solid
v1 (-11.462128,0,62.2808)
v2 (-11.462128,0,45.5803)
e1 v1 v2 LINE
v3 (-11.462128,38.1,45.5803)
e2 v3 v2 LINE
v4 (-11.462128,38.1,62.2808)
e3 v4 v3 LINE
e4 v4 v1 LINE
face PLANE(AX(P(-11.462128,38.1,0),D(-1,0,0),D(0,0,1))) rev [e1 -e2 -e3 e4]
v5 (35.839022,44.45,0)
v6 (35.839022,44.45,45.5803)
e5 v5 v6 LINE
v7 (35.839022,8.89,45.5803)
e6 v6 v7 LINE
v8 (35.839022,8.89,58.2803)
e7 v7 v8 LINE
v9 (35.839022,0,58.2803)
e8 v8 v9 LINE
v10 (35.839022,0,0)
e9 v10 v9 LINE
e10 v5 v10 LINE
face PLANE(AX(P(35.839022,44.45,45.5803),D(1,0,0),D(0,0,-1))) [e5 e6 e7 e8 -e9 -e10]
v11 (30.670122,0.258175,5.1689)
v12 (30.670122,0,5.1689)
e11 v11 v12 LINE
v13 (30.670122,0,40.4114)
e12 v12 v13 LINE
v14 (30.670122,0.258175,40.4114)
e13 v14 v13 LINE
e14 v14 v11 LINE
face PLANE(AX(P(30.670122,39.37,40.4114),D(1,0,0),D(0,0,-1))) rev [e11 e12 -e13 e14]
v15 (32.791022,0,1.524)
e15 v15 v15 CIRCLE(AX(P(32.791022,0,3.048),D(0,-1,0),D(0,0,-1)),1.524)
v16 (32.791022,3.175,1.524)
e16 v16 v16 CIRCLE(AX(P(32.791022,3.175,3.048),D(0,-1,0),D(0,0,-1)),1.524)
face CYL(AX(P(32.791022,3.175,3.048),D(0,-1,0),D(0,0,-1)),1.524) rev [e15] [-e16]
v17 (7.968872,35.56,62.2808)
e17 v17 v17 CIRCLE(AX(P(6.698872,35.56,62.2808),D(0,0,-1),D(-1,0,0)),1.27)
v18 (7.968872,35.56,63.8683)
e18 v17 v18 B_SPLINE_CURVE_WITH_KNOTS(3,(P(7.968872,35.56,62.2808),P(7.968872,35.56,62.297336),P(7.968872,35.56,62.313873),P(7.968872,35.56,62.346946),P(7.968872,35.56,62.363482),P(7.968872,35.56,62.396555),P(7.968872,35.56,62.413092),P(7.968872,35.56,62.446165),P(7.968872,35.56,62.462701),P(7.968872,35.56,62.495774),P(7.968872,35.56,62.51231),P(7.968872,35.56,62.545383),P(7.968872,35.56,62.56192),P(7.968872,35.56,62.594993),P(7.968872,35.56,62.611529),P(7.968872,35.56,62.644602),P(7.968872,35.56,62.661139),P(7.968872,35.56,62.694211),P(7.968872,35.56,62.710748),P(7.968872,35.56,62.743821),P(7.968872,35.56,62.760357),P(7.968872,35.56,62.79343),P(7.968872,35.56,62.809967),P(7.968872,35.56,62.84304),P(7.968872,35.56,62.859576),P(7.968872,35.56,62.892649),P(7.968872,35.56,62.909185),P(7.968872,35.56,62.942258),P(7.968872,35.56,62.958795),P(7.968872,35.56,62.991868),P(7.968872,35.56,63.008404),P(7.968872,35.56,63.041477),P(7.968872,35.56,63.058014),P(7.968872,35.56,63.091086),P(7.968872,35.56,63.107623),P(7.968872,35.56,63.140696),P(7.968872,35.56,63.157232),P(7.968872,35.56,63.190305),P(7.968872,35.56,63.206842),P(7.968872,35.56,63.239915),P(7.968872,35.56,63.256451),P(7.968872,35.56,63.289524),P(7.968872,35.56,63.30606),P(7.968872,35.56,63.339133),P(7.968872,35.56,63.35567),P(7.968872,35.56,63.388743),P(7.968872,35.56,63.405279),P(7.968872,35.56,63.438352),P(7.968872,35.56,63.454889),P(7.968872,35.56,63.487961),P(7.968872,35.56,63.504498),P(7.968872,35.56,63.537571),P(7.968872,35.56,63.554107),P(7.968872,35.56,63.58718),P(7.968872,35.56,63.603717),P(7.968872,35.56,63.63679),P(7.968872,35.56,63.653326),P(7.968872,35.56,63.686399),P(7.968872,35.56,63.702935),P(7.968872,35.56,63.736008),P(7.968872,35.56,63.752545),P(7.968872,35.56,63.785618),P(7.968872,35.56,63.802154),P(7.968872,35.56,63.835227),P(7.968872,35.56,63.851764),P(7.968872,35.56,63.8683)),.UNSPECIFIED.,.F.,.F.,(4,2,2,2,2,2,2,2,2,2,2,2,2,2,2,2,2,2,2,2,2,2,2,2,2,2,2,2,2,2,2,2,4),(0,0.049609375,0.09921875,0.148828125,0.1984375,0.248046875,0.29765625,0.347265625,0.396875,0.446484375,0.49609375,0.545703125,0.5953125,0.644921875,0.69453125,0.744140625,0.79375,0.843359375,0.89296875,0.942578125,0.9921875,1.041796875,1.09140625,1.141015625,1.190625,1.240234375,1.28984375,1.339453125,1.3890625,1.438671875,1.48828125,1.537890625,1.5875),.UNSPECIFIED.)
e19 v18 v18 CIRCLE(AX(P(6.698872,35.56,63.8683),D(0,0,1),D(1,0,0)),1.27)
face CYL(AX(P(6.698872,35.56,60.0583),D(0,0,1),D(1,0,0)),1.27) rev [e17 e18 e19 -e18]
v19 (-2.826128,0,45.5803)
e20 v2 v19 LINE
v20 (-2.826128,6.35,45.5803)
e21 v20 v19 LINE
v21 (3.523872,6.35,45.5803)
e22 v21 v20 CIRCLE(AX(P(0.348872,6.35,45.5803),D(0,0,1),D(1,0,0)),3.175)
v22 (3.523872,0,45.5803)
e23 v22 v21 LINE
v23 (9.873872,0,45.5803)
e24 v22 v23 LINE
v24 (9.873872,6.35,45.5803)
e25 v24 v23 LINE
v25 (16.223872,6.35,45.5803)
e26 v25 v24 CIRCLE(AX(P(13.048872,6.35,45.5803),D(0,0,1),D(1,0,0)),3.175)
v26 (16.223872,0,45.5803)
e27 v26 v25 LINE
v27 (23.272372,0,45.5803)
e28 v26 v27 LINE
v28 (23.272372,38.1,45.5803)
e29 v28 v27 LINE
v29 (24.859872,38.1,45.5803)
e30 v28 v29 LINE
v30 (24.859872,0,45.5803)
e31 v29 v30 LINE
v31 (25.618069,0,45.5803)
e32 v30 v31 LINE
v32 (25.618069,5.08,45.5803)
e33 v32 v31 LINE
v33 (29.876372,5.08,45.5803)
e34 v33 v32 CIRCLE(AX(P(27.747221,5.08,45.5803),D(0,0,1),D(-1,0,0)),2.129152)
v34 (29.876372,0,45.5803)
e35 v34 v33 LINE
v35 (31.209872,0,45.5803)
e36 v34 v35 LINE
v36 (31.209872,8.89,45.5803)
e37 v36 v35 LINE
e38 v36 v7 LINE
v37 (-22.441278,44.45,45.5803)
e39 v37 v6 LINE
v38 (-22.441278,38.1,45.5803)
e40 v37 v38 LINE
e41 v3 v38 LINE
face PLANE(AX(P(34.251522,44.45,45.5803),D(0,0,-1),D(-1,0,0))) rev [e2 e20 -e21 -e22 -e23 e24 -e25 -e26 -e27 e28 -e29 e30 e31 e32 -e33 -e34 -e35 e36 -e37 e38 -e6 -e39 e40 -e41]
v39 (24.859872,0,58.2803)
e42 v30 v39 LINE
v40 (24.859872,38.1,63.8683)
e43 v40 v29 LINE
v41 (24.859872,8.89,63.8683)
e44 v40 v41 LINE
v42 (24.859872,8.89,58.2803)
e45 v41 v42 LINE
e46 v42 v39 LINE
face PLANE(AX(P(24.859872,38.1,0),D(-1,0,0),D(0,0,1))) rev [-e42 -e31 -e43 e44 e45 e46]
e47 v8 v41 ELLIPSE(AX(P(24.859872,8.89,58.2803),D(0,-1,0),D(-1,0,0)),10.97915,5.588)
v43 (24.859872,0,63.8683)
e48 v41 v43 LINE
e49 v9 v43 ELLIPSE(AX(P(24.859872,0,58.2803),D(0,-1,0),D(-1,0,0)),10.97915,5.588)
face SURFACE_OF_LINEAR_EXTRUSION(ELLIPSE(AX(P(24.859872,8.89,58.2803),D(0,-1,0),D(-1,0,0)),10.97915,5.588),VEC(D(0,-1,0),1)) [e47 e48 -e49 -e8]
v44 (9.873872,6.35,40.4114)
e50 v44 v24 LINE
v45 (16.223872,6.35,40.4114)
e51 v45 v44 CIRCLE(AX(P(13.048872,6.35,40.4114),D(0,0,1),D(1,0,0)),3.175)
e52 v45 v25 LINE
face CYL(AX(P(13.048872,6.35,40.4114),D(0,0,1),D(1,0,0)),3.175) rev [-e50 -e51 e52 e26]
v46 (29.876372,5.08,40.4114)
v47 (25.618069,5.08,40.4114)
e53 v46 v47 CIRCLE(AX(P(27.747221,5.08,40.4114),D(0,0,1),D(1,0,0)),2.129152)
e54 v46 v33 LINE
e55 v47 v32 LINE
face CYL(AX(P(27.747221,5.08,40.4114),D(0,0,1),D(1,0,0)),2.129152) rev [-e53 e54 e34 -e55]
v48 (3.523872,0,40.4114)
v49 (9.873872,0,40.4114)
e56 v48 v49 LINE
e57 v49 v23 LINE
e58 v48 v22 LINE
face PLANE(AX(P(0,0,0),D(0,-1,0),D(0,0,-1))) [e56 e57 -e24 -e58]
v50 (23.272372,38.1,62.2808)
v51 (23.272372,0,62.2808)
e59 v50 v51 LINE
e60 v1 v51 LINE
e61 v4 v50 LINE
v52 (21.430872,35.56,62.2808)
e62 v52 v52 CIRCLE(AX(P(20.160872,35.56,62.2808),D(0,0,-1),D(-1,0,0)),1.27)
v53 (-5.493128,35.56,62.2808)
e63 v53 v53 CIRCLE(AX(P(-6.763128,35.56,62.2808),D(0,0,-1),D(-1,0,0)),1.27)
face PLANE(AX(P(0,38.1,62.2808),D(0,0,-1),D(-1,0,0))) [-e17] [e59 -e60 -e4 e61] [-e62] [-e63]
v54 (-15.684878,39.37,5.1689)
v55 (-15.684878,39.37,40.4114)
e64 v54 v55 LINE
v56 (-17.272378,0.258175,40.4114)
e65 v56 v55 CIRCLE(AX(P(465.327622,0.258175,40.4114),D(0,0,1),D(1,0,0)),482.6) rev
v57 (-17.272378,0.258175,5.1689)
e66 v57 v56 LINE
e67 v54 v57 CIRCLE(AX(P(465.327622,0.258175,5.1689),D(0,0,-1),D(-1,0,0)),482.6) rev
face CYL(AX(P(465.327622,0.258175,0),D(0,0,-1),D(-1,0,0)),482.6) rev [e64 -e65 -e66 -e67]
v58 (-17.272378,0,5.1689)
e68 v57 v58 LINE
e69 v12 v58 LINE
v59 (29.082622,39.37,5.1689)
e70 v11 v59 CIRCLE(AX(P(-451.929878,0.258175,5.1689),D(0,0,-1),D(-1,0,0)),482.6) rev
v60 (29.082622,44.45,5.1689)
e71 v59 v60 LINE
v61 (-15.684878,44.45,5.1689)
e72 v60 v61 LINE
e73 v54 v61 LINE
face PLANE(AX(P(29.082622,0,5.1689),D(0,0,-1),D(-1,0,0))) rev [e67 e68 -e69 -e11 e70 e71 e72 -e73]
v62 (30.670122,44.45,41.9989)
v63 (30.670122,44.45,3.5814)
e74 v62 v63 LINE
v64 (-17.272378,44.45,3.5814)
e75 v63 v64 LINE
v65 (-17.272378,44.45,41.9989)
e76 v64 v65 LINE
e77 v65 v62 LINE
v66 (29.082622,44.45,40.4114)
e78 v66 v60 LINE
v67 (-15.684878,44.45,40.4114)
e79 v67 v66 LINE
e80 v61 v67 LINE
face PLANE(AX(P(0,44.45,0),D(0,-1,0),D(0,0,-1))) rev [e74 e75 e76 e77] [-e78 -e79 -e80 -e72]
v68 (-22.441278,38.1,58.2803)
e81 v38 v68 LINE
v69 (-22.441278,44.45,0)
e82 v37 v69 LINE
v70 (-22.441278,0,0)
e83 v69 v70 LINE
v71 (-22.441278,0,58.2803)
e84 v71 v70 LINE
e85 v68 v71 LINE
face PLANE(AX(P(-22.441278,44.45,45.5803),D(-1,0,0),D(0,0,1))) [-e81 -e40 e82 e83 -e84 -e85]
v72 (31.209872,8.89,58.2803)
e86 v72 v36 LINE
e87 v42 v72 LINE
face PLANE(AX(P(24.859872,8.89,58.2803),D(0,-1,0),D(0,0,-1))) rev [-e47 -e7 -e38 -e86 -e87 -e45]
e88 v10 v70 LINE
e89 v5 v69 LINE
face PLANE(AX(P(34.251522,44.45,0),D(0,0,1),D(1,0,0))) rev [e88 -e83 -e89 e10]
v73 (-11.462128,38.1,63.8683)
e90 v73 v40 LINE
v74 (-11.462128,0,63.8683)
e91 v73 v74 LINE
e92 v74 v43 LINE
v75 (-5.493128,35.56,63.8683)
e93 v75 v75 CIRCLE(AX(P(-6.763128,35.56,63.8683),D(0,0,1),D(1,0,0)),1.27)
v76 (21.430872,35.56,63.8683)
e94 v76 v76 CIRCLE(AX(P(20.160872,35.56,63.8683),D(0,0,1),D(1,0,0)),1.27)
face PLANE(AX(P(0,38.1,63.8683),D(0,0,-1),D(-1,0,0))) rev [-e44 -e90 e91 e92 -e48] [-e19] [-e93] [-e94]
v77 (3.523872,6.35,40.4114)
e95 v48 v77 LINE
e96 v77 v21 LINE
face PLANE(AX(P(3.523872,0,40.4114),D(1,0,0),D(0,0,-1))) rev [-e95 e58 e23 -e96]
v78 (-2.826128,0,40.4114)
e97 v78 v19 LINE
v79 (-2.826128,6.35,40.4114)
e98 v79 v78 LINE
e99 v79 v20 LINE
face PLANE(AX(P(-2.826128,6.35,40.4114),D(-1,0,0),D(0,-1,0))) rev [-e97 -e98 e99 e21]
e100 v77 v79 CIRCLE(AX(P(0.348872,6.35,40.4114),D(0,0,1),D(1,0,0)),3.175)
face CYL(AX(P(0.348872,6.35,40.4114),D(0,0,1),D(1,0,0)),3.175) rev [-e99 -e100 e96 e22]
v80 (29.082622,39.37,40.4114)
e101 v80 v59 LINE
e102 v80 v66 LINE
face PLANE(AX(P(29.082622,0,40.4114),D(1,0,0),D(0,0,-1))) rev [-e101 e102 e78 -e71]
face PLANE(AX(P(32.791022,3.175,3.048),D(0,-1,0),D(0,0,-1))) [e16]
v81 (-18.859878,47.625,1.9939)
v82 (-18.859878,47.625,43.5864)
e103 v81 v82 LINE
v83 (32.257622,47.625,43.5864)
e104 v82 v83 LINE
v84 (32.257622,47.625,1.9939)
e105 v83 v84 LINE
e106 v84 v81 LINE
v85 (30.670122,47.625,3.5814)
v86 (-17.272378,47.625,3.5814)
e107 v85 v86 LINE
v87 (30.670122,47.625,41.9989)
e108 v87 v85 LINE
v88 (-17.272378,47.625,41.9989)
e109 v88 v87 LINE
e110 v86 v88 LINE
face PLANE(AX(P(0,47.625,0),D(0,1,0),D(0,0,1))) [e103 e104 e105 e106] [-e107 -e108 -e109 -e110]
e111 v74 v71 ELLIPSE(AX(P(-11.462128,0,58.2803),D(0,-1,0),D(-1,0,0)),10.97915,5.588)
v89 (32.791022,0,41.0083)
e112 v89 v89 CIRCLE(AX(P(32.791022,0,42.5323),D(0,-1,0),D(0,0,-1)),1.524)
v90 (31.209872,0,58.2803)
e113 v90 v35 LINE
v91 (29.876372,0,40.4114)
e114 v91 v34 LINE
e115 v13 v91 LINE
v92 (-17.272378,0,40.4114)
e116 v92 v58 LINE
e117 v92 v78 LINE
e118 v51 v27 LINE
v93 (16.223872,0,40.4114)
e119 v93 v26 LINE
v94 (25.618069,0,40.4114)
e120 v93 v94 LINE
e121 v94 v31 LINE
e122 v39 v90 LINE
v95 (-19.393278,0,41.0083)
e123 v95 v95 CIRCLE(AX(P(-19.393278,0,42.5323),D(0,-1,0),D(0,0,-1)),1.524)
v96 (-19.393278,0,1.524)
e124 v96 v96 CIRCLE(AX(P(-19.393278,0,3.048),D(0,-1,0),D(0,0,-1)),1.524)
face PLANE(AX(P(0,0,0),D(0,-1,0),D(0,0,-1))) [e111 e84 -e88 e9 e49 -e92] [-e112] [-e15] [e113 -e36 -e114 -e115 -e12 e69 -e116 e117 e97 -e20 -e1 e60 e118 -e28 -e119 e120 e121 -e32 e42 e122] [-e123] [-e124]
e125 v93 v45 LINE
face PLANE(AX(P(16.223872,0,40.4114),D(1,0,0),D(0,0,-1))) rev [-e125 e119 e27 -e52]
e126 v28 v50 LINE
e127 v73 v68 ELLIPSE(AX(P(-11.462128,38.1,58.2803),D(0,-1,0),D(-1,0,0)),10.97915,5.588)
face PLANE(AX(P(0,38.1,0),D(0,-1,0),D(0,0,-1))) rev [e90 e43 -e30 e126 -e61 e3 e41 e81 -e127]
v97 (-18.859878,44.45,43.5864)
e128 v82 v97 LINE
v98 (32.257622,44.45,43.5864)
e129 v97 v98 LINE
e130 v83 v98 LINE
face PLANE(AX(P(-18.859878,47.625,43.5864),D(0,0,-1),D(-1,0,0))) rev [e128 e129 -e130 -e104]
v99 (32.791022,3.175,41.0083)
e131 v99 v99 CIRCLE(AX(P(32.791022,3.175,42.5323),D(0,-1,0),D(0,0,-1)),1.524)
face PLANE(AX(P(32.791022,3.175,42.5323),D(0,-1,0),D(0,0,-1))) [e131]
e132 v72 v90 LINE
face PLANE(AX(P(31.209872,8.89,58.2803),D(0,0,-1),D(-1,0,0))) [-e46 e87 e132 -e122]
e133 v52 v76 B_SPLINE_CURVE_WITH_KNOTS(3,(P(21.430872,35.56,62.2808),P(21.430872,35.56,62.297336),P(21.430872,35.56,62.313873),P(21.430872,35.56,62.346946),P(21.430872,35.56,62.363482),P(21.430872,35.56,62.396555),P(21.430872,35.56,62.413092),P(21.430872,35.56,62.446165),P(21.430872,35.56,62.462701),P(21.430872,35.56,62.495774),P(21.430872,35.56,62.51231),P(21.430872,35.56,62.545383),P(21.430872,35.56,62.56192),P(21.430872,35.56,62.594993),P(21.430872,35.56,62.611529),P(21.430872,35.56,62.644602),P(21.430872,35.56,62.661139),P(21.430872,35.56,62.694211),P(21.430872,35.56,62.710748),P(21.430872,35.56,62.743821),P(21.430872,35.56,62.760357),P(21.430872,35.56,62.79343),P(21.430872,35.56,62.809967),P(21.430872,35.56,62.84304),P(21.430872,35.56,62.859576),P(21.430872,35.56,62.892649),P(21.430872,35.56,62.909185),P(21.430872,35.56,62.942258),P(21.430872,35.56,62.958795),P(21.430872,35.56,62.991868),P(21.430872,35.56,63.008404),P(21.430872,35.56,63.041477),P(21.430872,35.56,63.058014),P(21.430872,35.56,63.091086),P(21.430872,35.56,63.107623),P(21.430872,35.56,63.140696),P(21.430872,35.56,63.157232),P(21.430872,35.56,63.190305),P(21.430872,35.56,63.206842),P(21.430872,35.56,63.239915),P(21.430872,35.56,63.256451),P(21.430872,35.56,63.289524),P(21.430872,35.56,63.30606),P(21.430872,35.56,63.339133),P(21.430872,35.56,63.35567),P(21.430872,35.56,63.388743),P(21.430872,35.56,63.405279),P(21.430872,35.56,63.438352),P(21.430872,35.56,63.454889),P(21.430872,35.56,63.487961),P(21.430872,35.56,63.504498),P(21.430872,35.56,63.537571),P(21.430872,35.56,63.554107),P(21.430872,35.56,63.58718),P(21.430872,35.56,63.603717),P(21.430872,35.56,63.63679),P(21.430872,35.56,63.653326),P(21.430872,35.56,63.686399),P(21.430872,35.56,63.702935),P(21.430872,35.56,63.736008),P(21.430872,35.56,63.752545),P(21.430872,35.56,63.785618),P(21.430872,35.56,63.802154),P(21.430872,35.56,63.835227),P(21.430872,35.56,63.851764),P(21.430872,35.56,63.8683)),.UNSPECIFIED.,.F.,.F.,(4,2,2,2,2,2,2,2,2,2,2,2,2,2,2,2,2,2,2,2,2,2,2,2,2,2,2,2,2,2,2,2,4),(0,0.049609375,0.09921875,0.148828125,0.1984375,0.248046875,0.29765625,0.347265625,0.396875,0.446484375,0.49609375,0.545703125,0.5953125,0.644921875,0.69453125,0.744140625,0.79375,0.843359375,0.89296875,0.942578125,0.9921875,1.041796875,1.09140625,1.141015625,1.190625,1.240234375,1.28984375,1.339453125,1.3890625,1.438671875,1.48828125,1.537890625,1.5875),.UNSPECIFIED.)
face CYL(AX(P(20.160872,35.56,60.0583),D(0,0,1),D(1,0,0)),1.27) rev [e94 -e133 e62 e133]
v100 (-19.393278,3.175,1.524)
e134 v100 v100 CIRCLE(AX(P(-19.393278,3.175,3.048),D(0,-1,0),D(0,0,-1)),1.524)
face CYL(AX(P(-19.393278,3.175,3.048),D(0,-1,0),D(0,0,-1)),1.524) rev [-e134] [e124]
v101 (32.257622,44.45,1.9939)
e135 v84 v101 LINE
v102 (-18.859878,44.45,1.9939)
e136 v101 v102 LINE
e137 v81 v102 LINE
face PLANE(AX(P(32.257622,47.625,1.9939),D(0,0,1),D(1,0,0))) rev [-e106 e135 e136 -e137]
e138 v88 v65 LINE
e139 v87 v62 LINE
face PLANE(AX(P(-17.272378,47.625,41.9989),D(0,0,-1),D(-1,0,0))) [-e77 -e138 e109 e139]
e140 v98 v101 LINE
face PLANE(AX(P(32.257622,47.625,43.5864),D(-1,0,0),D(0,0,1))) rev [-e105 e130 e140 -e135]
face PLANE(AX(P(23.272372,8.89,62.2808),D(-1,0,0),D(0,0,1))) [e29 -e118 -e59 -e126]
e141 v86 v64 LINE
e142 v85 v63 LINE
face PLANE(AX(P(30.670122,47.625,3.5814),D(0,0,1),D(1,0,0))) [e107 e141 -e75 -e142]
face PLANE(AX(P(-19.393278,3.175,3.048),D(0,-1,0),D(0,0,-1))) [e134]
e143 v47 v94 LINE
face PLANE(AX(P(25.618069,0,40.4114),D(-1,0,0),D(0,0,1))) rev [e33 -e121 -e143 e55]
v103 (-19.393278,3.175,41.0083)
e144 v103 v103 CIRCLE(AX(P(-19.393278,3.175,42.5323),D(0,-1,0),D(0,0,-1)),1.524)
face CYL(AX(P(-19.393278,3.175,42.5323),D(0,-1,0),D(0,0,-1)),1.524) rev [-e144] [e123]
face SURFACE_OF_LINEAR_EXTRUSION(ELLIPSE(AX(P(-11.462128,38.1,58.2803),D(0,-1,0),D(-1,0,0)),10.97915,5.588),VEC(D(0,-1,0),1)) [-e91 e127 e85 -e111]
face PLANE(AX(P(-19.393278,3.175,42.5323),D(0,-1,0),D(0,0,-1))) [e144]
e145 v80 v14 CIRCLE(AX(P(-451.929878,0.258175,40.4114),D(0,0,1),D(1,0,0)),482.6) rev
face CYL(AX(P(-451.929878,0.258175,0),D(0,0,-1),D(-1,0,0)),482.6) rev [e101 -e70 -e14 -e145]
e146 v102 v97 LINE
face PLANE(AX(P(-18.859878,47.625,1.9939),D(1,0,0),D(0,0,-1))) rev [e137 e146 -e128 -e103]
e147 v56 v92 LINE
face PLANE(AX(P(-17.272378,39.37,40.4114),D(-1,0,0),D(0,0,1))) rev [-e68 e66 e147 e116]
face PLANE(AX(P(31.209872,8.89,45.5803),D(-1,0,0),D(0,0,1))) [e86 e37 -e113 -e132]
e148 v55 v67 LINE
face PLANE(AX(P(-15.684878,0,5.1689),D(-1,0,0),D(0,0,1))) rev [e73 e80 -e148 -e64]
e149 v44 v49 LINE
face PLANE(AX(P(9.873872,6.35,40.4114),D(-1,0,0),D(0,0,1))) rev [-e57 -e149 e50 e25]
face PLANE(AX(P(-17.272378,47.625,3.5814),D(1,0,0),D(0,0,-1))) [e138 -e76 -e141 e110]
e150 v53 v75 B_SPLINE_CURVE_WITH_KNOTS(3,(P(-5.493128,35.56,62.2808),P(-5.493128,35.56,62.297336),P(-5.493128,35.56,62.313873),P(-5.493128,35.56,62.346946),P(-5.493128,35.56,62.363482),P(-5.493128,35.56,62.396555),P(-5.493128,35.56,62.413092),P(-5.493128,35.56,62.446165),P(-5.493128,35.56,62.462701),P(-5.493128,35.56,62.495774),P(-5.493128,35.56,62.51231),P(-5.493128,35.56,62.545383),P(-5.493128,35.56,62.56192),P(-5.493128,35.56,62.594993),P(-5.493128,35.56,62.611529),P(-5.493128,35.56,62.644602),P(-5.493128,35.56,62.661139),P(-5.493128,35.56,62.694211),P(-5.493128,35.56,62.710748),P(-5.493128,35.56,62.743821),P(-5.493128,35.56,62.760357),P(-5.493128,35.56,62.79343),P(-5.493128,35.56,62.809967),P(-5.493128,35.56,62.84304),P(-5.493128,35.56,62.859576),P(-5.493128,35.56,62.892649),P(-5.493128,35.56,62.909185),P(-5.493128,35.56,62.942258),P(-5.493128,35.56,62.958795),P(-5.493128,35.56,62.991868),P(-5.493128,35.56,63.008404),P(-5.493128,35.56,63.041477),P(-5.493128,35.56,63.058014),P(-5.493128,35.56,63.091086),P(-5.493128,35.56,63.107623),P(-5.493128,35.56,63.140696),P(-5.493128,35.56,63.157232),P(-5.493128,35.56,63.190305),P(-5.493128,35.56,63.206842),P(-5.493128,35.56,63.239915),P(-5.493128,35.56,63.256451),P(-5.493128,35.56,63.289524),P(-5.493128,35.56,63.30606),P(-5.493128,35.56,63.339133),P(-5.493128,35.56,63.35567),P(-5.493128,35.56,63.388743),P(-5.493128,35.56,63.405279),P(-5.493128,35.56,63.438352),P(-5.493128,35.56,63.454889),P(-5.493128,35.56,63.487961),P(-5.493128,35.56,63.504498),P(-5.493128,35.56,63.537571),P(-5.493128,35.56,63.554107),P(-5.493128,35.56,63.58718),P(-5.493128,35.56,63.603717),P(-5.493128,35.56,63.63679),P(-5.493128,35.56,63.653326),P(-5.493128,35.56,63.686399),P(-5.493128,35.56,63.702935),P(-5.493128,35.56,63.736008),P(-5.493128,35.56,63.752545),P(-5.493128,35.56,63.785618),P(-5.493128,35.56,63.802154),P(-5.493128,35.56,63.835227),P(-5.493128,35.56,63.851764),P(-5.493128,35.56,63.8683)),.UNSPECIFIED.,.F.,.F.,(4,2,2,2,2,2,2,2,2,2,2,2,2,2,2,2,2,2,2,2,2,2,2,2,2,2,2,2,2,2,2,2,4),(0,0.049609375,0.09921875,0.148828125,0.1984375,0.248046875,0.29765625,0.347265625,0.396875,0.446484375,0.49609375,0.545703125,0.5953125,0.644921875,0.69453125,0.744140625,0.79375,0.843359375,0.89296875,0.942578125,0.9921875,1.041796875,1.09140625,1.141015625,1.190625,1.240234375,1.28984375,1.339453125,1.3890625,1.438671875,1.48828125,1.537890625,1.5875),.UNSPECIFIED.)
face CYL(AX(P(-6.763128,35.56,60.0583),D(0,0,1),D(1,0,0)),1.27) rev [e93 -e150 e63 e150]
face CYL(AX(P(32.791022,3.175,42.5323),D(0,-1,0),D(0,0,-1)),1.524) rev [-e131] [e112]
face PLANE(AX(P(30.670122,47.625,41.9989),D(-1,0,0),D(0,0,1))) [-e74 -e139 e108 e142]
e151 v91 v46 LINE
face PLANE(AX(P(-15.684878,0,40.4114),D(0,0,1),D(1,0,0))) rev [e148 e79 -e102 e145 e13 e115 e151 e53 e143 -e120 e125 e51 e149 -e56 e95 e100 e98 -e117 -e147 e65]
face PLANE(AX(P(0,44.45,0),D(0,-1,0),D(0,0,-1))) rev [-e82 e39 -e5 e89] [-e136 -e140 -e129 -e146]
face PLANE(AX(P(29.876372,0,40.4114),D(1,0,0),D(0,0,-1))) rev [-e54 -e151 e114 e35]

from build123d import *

# Parameters (mm, degrees)
SKETCH3_W            = 55.1053
SKETCH3_H            = 45.5803
BOSS_EXTRUDE2_DEPTH  = 44.45
SKETCH11_W           = 51.1175
SKETCH11_H           = 41.5925
SKETCH11_W_2         = 47.9425
SKETCH11_H_2         = 38.4175
BOSS_EXTRUDE3_DEPTH  = 3.175
SKETCH13_W           = 44.7675
SKETCH13_H           = 35.2425
CUT_EXTRUDE3_DEPTH   = 73.294764944
CUT_EXTRUDE4_DEPTH   = 5.1689
SKETCH19_W           = 1.5875
SKETCH19_H           = 45.5803
BOSS_EXTRUDE4_DEPTH  = 44.45
SKETCH21_W           = 1.5875
SKETCH21_H           = 35.2425
CUT_EXTRUDE5_DEPTH   = 39.37
FILLET1_R            = 482.6
FILLET2_R            = 482.6
SKETCH22_R           = 1.524
CUT_EXTRUDE7_DEPTH   = 3.175
BOSS_EXTRUDE5_DEPTH  = 38.1
SKETCH39_R           = 1.27
CUT_EXTRUDE14_DEPTH  = 3.81
BOSS_EXTRUDE22_DEPTH = 8.89
SKETCH48_W           = 18.288
SKETCH48_H           = 29.21
BOSS_EXTRUDE23_DEPTH = 1.5875


with BuildPart() as part:
    # Sketch3 → Boss-Extrude2 (new body)
    with BuildSketch(Plane(origin=(0, 0, 0), x_dir=(1, 0, 0), z_dir=(0, 1, 0))):
        with Locations((6.69887245, -22.79015)):
            Rectangle(SKETCH3_W, SKETCH3_H)
    extrude(amount=BOSS_EXTRUDE2_DEPTH)

    # Sketch11 → Boss-Extrude3 (add)
    with BuildSketch(Plane(origin=(0, 44.45, 0), x_dir=(1, 0, 0), z_dir=(0, 1, 0))):
        with Locations((6.69887245, -22.79015)):
            Rectangle(SKETCH11_W, SKETCH11_H)
        with Locations((6.69887245, -22.79015)):
            Rectangle(SKETCH11_W_2, SKETCH11_H_2, mode=Mode.SUBTRACT)
    extrude(amount=BOSS_EXTRUDE3_DEPTH)

    # Sketch13 → Cut-Extrude3 (cut, through all)
    with BuildSketch(Plane(origin=(0, 44.45, 0), x_dir=(1, 0, 0), z_dir=(0, 1, 0))):
        with Locations((6.69887245, -22.79015)):
            Rectangle(SKETCH13_W, SKETCH13_H)
    extrude(amount=-CUT_EXTRUDE3_DEPTH, mode=Mode.SUBTRACT)

    # Sketch14 → Cut-Extrude4 (cut)
    with BuildSketch(Plane.XY.offset(45.5803)):
        with BuildLine():
            Line((-2.82612755, 6.35), (-2.82612755, 0))
            Line((-2.82612755, 0), (3.52387245, 0))
            Line((3.52387245, 0), (3.52387245, 6.35))
            ThreePointArc((3.52387245, 6.35), (0.34887245, 9.525), (-2.82612755, 6.35))
        make_face()
        with BuildLine():
            Line((9.87387245, 6.35), (9.87387245, 0))
            Line((9.87387245, 0), (16.22387245, 0))
            Line((16.22387245, 0), (16.22387245, 6.35))
            ThreePointArc((16.22387245, 6.35), (13.04887245, 9.525), (9.87387245, 6.35))
        make_face()
        with BuildLine():
            Line((25.618069301, 0), (29.87637245, 0))
            Line((29.87637245, 0), (29.87637245, 5.08))
            ThreePointArc((29.87637245, 5.08), (27.747220876, 7.209151575), (25.618069301, 5.08))
            Line((25.618069301, 5.08), (25.618069301, 0))
        make_face()
    extrude(amount=-CUT_EXTRUDE4_DEPTH, mode=Mode.SUBTRACT)

    # Sketch19 → Boss-Extrude4 (add)
    with BuildSketch(Plane.XZ):
        with Locations((-21.64752755, 22.79015)):
            Rectangle(SKETCH19_W, SKETCH19_H)
        with Locations((35.04527245, 22.79015)):
            Rectangle(SKETCH19_W, SKETCH19_H)
    extrude(amount=-BOSS_EXTRUDE4_DEPTH)

    # Sketch21 → Cut-Extrude5 (cut)
    with BuildSketch(Plane(origin=(0, 0, 0), x_dir=(-1, 0, 0), z_dir=(0, -1, 0))):
        with Locations((16.47862755, -22.79015)):
            Rectangle(SKETCH21_W, SKETCH21_H)
        with Locations((-29.87637245, -22.79015)):
            Rectangle(SKETCH21_W, SKETCH21_H)
    extrude(amount=-CUT_EXTRUDE5_DEPTH, mode=Mode.SUBTRACT)

    # Fillet1
    # the kernel refuses this fillet: 482.6 mm, written as the material it adds along each edge
    with BuildSketch(Plane(origin=(-17.27237755, 39.37, 40.4114), x_dir=(1, 0, 0), z_dir=(0, 0, -1))) as fillet1_piece_1:
        with BuildLine():
            CenterArc((482.6, 39.111824858), FILLET1_R, 180, 4.648576264)
            Line((0, 39.111824858), (0, 0))
            Line((0, 0), (1.5875, 0))
        make_face()
    extrude(amount=35.2425)

    # Fillet2
    # the kernel refuses this fillet: 482.6 mm, written as the material it adds along each edge
    with BuildSketch(Plane(origin=(30.67012245, 39.37, 138.190962146), x_dir=(0, -1, 0), z_dir=(0, 0, -1))) as fillet2_piece_1_section:
        with BuildLine():
            CenterArc((39.111824858, 482.6), FILLET2_R, 265.351423736, 4.648576264)
            Line((0, 1.5875), (0, 0))
            Line((0, 0), (39.111824858, 0))
        make_face()
    fillet2_piece_1 = extrude(amount=230.801624292, mode=Mode.PRIVATE)
    fillet2_piece_1 = split(fillet2_piece_1, bisect_by=Plane(origin=(30.67012245, 39.37, 45.5803), z_dir=(0, 0, -1)), keep=Keep.TOP, mode=Mode.PRIVATE)
    fillet2_piece_1 = split(fillet2_piece_1, bisect_by=Plane(origin=(30.67012245, 39.37, 0), z_dir=(0, 0, 1)), keep=Keep.TOP, mode=Mode.PRIVATE)
    add(fillet2_piece_1)

    # Sketch22 → Cut-Extrude7 (cut)
    with BuildSketch(Plane.XZ):
        with Locations(Location((-19.39327755, 42.5323, 0), (0, 0, 270))):
            Circle(SKETCH22_R)
        with Locations(Location((32.79102245, 42.5323, 0), (0, 0, 270))):
            Circle(SKETCH22_R)
        with Locations(Location((-19.39327755, 3.048, 0), (0, 0, 270))):
            Circle(SKETCH22_R)
        with Locations(Location((32.79102245, 3.048, 0), (0, 0, 270))):
            Circle(SKETCH22_R)
    extrude(amount=-CUT_EXTRUDE7_DEPTH, mode=Mode.SUBTRACT)

    # Sketch23 → Boss-Extrude5 (add)
    with BuildSketch(Plane.XZ):
        with BuildLine():
            Line((24.85987245, 63.8683), (-11.46212755, 63.8683))
            add(Edge.make_bspline(
                [(-11.46212755, 63.8683), (-22.44127755, 63.8683), (-22.44127755, 58.2803)],
                knots=[4.71238898, 4.71238898, 4.71238898, 6.283185307, 6.283185307, 6.283185307], degree=2, weights=[1, 0.707106781, 1]))
            Line((-22.44127755, 58.2803), (-22.44127755, 45.5803))
            Line((-22.44127755, 45.5803), (-20.85377755, 45.5803))
            Line((-20.85377755, 45.5803), (-11.46212755, 45.5803))
            Line((-11.46212755, 45.5803), (-11.46212755, 62.2808))
            Line((-11.46212755, 62.2808), (24.85987245, 62.2808))
            Line((24.85987245, 62.2808), (24.85987245, 63.8683))
        make_face()
    extrude(amount=-BOSS_EXTRUDE5_DEPTH)

    # Sketch39 → Cut-Extrude14 (cut)
    with BuildSketch(Plane.XY.offset(63.8683)):
        with Locations((6.69887245, 35.56)):
            Circle(SKETCH39_R)
        with Locations((-6.76312755, 35.56)):
            Circle(SKETCH39_R)
        with Locations((20.16087245, 35.56)):
            Circle(SKETCH39_R)
    extrude(amount=-CUT_EXTRUDE14_DEPTH, mode=Mode.SUBTRACT)

    # Sketch43 → Boss-Extrude22 (add)
    with BuildSketch(Plane.XZ):
        with BuildLine():
            Line((31.20987245, 45.5803), (35.83902245, 45.5803))
            Line((35.83902245, 45.5803), (35.83902245, 58.2803))
            add(Edge.make_bspline(
                [(35.83902245, 58.2803), (35.83902245, 63.8683), (24.85987245, 63.8683)],
                knots=[3.141592654, 3.141592654, 3.141592654, 4.71238898, 4.71238898, 4.71238898], degree=2, weights=[1, 0.707106781, 1]))
            Line((24.85987245, 63.8683), (24.85987245, 62.2808))
            Line((24.85987245, 62.2808), (23.27237245, 62.2808))
            Line((23.27237245, 62.2808), (23.27237245, 45.5803))
            Line((23.27237245, 45.5803), (24.85987245, 45.5803))
            Line((24.85987245, 45.5803), (24.85987245, 58.2803))
            Line((24.85987245, 58.2803), (31.20987245, 58.2803))
            Line((31.20987245, 58.2803), (31.20987245, 45.5803))
        make_face()
    extrude(amount=-BOSS_EXTRUDE22_DEPTH)

    # Sketch48 → Boss-Extrude23 (add)
    with BuildSketch(Plane(origin=(24.85987245, 0, 0), x_dir=(0, 0, -1), z_dir=(1, 0, 0))):
        with Locations((-54.7243, 23.495)):
            Rectangle(SKETCH48_W, SKETCH48_H)
    extrude(amount=-BOSS_EXTRUDE23_DEPTH)


solid = part.part
